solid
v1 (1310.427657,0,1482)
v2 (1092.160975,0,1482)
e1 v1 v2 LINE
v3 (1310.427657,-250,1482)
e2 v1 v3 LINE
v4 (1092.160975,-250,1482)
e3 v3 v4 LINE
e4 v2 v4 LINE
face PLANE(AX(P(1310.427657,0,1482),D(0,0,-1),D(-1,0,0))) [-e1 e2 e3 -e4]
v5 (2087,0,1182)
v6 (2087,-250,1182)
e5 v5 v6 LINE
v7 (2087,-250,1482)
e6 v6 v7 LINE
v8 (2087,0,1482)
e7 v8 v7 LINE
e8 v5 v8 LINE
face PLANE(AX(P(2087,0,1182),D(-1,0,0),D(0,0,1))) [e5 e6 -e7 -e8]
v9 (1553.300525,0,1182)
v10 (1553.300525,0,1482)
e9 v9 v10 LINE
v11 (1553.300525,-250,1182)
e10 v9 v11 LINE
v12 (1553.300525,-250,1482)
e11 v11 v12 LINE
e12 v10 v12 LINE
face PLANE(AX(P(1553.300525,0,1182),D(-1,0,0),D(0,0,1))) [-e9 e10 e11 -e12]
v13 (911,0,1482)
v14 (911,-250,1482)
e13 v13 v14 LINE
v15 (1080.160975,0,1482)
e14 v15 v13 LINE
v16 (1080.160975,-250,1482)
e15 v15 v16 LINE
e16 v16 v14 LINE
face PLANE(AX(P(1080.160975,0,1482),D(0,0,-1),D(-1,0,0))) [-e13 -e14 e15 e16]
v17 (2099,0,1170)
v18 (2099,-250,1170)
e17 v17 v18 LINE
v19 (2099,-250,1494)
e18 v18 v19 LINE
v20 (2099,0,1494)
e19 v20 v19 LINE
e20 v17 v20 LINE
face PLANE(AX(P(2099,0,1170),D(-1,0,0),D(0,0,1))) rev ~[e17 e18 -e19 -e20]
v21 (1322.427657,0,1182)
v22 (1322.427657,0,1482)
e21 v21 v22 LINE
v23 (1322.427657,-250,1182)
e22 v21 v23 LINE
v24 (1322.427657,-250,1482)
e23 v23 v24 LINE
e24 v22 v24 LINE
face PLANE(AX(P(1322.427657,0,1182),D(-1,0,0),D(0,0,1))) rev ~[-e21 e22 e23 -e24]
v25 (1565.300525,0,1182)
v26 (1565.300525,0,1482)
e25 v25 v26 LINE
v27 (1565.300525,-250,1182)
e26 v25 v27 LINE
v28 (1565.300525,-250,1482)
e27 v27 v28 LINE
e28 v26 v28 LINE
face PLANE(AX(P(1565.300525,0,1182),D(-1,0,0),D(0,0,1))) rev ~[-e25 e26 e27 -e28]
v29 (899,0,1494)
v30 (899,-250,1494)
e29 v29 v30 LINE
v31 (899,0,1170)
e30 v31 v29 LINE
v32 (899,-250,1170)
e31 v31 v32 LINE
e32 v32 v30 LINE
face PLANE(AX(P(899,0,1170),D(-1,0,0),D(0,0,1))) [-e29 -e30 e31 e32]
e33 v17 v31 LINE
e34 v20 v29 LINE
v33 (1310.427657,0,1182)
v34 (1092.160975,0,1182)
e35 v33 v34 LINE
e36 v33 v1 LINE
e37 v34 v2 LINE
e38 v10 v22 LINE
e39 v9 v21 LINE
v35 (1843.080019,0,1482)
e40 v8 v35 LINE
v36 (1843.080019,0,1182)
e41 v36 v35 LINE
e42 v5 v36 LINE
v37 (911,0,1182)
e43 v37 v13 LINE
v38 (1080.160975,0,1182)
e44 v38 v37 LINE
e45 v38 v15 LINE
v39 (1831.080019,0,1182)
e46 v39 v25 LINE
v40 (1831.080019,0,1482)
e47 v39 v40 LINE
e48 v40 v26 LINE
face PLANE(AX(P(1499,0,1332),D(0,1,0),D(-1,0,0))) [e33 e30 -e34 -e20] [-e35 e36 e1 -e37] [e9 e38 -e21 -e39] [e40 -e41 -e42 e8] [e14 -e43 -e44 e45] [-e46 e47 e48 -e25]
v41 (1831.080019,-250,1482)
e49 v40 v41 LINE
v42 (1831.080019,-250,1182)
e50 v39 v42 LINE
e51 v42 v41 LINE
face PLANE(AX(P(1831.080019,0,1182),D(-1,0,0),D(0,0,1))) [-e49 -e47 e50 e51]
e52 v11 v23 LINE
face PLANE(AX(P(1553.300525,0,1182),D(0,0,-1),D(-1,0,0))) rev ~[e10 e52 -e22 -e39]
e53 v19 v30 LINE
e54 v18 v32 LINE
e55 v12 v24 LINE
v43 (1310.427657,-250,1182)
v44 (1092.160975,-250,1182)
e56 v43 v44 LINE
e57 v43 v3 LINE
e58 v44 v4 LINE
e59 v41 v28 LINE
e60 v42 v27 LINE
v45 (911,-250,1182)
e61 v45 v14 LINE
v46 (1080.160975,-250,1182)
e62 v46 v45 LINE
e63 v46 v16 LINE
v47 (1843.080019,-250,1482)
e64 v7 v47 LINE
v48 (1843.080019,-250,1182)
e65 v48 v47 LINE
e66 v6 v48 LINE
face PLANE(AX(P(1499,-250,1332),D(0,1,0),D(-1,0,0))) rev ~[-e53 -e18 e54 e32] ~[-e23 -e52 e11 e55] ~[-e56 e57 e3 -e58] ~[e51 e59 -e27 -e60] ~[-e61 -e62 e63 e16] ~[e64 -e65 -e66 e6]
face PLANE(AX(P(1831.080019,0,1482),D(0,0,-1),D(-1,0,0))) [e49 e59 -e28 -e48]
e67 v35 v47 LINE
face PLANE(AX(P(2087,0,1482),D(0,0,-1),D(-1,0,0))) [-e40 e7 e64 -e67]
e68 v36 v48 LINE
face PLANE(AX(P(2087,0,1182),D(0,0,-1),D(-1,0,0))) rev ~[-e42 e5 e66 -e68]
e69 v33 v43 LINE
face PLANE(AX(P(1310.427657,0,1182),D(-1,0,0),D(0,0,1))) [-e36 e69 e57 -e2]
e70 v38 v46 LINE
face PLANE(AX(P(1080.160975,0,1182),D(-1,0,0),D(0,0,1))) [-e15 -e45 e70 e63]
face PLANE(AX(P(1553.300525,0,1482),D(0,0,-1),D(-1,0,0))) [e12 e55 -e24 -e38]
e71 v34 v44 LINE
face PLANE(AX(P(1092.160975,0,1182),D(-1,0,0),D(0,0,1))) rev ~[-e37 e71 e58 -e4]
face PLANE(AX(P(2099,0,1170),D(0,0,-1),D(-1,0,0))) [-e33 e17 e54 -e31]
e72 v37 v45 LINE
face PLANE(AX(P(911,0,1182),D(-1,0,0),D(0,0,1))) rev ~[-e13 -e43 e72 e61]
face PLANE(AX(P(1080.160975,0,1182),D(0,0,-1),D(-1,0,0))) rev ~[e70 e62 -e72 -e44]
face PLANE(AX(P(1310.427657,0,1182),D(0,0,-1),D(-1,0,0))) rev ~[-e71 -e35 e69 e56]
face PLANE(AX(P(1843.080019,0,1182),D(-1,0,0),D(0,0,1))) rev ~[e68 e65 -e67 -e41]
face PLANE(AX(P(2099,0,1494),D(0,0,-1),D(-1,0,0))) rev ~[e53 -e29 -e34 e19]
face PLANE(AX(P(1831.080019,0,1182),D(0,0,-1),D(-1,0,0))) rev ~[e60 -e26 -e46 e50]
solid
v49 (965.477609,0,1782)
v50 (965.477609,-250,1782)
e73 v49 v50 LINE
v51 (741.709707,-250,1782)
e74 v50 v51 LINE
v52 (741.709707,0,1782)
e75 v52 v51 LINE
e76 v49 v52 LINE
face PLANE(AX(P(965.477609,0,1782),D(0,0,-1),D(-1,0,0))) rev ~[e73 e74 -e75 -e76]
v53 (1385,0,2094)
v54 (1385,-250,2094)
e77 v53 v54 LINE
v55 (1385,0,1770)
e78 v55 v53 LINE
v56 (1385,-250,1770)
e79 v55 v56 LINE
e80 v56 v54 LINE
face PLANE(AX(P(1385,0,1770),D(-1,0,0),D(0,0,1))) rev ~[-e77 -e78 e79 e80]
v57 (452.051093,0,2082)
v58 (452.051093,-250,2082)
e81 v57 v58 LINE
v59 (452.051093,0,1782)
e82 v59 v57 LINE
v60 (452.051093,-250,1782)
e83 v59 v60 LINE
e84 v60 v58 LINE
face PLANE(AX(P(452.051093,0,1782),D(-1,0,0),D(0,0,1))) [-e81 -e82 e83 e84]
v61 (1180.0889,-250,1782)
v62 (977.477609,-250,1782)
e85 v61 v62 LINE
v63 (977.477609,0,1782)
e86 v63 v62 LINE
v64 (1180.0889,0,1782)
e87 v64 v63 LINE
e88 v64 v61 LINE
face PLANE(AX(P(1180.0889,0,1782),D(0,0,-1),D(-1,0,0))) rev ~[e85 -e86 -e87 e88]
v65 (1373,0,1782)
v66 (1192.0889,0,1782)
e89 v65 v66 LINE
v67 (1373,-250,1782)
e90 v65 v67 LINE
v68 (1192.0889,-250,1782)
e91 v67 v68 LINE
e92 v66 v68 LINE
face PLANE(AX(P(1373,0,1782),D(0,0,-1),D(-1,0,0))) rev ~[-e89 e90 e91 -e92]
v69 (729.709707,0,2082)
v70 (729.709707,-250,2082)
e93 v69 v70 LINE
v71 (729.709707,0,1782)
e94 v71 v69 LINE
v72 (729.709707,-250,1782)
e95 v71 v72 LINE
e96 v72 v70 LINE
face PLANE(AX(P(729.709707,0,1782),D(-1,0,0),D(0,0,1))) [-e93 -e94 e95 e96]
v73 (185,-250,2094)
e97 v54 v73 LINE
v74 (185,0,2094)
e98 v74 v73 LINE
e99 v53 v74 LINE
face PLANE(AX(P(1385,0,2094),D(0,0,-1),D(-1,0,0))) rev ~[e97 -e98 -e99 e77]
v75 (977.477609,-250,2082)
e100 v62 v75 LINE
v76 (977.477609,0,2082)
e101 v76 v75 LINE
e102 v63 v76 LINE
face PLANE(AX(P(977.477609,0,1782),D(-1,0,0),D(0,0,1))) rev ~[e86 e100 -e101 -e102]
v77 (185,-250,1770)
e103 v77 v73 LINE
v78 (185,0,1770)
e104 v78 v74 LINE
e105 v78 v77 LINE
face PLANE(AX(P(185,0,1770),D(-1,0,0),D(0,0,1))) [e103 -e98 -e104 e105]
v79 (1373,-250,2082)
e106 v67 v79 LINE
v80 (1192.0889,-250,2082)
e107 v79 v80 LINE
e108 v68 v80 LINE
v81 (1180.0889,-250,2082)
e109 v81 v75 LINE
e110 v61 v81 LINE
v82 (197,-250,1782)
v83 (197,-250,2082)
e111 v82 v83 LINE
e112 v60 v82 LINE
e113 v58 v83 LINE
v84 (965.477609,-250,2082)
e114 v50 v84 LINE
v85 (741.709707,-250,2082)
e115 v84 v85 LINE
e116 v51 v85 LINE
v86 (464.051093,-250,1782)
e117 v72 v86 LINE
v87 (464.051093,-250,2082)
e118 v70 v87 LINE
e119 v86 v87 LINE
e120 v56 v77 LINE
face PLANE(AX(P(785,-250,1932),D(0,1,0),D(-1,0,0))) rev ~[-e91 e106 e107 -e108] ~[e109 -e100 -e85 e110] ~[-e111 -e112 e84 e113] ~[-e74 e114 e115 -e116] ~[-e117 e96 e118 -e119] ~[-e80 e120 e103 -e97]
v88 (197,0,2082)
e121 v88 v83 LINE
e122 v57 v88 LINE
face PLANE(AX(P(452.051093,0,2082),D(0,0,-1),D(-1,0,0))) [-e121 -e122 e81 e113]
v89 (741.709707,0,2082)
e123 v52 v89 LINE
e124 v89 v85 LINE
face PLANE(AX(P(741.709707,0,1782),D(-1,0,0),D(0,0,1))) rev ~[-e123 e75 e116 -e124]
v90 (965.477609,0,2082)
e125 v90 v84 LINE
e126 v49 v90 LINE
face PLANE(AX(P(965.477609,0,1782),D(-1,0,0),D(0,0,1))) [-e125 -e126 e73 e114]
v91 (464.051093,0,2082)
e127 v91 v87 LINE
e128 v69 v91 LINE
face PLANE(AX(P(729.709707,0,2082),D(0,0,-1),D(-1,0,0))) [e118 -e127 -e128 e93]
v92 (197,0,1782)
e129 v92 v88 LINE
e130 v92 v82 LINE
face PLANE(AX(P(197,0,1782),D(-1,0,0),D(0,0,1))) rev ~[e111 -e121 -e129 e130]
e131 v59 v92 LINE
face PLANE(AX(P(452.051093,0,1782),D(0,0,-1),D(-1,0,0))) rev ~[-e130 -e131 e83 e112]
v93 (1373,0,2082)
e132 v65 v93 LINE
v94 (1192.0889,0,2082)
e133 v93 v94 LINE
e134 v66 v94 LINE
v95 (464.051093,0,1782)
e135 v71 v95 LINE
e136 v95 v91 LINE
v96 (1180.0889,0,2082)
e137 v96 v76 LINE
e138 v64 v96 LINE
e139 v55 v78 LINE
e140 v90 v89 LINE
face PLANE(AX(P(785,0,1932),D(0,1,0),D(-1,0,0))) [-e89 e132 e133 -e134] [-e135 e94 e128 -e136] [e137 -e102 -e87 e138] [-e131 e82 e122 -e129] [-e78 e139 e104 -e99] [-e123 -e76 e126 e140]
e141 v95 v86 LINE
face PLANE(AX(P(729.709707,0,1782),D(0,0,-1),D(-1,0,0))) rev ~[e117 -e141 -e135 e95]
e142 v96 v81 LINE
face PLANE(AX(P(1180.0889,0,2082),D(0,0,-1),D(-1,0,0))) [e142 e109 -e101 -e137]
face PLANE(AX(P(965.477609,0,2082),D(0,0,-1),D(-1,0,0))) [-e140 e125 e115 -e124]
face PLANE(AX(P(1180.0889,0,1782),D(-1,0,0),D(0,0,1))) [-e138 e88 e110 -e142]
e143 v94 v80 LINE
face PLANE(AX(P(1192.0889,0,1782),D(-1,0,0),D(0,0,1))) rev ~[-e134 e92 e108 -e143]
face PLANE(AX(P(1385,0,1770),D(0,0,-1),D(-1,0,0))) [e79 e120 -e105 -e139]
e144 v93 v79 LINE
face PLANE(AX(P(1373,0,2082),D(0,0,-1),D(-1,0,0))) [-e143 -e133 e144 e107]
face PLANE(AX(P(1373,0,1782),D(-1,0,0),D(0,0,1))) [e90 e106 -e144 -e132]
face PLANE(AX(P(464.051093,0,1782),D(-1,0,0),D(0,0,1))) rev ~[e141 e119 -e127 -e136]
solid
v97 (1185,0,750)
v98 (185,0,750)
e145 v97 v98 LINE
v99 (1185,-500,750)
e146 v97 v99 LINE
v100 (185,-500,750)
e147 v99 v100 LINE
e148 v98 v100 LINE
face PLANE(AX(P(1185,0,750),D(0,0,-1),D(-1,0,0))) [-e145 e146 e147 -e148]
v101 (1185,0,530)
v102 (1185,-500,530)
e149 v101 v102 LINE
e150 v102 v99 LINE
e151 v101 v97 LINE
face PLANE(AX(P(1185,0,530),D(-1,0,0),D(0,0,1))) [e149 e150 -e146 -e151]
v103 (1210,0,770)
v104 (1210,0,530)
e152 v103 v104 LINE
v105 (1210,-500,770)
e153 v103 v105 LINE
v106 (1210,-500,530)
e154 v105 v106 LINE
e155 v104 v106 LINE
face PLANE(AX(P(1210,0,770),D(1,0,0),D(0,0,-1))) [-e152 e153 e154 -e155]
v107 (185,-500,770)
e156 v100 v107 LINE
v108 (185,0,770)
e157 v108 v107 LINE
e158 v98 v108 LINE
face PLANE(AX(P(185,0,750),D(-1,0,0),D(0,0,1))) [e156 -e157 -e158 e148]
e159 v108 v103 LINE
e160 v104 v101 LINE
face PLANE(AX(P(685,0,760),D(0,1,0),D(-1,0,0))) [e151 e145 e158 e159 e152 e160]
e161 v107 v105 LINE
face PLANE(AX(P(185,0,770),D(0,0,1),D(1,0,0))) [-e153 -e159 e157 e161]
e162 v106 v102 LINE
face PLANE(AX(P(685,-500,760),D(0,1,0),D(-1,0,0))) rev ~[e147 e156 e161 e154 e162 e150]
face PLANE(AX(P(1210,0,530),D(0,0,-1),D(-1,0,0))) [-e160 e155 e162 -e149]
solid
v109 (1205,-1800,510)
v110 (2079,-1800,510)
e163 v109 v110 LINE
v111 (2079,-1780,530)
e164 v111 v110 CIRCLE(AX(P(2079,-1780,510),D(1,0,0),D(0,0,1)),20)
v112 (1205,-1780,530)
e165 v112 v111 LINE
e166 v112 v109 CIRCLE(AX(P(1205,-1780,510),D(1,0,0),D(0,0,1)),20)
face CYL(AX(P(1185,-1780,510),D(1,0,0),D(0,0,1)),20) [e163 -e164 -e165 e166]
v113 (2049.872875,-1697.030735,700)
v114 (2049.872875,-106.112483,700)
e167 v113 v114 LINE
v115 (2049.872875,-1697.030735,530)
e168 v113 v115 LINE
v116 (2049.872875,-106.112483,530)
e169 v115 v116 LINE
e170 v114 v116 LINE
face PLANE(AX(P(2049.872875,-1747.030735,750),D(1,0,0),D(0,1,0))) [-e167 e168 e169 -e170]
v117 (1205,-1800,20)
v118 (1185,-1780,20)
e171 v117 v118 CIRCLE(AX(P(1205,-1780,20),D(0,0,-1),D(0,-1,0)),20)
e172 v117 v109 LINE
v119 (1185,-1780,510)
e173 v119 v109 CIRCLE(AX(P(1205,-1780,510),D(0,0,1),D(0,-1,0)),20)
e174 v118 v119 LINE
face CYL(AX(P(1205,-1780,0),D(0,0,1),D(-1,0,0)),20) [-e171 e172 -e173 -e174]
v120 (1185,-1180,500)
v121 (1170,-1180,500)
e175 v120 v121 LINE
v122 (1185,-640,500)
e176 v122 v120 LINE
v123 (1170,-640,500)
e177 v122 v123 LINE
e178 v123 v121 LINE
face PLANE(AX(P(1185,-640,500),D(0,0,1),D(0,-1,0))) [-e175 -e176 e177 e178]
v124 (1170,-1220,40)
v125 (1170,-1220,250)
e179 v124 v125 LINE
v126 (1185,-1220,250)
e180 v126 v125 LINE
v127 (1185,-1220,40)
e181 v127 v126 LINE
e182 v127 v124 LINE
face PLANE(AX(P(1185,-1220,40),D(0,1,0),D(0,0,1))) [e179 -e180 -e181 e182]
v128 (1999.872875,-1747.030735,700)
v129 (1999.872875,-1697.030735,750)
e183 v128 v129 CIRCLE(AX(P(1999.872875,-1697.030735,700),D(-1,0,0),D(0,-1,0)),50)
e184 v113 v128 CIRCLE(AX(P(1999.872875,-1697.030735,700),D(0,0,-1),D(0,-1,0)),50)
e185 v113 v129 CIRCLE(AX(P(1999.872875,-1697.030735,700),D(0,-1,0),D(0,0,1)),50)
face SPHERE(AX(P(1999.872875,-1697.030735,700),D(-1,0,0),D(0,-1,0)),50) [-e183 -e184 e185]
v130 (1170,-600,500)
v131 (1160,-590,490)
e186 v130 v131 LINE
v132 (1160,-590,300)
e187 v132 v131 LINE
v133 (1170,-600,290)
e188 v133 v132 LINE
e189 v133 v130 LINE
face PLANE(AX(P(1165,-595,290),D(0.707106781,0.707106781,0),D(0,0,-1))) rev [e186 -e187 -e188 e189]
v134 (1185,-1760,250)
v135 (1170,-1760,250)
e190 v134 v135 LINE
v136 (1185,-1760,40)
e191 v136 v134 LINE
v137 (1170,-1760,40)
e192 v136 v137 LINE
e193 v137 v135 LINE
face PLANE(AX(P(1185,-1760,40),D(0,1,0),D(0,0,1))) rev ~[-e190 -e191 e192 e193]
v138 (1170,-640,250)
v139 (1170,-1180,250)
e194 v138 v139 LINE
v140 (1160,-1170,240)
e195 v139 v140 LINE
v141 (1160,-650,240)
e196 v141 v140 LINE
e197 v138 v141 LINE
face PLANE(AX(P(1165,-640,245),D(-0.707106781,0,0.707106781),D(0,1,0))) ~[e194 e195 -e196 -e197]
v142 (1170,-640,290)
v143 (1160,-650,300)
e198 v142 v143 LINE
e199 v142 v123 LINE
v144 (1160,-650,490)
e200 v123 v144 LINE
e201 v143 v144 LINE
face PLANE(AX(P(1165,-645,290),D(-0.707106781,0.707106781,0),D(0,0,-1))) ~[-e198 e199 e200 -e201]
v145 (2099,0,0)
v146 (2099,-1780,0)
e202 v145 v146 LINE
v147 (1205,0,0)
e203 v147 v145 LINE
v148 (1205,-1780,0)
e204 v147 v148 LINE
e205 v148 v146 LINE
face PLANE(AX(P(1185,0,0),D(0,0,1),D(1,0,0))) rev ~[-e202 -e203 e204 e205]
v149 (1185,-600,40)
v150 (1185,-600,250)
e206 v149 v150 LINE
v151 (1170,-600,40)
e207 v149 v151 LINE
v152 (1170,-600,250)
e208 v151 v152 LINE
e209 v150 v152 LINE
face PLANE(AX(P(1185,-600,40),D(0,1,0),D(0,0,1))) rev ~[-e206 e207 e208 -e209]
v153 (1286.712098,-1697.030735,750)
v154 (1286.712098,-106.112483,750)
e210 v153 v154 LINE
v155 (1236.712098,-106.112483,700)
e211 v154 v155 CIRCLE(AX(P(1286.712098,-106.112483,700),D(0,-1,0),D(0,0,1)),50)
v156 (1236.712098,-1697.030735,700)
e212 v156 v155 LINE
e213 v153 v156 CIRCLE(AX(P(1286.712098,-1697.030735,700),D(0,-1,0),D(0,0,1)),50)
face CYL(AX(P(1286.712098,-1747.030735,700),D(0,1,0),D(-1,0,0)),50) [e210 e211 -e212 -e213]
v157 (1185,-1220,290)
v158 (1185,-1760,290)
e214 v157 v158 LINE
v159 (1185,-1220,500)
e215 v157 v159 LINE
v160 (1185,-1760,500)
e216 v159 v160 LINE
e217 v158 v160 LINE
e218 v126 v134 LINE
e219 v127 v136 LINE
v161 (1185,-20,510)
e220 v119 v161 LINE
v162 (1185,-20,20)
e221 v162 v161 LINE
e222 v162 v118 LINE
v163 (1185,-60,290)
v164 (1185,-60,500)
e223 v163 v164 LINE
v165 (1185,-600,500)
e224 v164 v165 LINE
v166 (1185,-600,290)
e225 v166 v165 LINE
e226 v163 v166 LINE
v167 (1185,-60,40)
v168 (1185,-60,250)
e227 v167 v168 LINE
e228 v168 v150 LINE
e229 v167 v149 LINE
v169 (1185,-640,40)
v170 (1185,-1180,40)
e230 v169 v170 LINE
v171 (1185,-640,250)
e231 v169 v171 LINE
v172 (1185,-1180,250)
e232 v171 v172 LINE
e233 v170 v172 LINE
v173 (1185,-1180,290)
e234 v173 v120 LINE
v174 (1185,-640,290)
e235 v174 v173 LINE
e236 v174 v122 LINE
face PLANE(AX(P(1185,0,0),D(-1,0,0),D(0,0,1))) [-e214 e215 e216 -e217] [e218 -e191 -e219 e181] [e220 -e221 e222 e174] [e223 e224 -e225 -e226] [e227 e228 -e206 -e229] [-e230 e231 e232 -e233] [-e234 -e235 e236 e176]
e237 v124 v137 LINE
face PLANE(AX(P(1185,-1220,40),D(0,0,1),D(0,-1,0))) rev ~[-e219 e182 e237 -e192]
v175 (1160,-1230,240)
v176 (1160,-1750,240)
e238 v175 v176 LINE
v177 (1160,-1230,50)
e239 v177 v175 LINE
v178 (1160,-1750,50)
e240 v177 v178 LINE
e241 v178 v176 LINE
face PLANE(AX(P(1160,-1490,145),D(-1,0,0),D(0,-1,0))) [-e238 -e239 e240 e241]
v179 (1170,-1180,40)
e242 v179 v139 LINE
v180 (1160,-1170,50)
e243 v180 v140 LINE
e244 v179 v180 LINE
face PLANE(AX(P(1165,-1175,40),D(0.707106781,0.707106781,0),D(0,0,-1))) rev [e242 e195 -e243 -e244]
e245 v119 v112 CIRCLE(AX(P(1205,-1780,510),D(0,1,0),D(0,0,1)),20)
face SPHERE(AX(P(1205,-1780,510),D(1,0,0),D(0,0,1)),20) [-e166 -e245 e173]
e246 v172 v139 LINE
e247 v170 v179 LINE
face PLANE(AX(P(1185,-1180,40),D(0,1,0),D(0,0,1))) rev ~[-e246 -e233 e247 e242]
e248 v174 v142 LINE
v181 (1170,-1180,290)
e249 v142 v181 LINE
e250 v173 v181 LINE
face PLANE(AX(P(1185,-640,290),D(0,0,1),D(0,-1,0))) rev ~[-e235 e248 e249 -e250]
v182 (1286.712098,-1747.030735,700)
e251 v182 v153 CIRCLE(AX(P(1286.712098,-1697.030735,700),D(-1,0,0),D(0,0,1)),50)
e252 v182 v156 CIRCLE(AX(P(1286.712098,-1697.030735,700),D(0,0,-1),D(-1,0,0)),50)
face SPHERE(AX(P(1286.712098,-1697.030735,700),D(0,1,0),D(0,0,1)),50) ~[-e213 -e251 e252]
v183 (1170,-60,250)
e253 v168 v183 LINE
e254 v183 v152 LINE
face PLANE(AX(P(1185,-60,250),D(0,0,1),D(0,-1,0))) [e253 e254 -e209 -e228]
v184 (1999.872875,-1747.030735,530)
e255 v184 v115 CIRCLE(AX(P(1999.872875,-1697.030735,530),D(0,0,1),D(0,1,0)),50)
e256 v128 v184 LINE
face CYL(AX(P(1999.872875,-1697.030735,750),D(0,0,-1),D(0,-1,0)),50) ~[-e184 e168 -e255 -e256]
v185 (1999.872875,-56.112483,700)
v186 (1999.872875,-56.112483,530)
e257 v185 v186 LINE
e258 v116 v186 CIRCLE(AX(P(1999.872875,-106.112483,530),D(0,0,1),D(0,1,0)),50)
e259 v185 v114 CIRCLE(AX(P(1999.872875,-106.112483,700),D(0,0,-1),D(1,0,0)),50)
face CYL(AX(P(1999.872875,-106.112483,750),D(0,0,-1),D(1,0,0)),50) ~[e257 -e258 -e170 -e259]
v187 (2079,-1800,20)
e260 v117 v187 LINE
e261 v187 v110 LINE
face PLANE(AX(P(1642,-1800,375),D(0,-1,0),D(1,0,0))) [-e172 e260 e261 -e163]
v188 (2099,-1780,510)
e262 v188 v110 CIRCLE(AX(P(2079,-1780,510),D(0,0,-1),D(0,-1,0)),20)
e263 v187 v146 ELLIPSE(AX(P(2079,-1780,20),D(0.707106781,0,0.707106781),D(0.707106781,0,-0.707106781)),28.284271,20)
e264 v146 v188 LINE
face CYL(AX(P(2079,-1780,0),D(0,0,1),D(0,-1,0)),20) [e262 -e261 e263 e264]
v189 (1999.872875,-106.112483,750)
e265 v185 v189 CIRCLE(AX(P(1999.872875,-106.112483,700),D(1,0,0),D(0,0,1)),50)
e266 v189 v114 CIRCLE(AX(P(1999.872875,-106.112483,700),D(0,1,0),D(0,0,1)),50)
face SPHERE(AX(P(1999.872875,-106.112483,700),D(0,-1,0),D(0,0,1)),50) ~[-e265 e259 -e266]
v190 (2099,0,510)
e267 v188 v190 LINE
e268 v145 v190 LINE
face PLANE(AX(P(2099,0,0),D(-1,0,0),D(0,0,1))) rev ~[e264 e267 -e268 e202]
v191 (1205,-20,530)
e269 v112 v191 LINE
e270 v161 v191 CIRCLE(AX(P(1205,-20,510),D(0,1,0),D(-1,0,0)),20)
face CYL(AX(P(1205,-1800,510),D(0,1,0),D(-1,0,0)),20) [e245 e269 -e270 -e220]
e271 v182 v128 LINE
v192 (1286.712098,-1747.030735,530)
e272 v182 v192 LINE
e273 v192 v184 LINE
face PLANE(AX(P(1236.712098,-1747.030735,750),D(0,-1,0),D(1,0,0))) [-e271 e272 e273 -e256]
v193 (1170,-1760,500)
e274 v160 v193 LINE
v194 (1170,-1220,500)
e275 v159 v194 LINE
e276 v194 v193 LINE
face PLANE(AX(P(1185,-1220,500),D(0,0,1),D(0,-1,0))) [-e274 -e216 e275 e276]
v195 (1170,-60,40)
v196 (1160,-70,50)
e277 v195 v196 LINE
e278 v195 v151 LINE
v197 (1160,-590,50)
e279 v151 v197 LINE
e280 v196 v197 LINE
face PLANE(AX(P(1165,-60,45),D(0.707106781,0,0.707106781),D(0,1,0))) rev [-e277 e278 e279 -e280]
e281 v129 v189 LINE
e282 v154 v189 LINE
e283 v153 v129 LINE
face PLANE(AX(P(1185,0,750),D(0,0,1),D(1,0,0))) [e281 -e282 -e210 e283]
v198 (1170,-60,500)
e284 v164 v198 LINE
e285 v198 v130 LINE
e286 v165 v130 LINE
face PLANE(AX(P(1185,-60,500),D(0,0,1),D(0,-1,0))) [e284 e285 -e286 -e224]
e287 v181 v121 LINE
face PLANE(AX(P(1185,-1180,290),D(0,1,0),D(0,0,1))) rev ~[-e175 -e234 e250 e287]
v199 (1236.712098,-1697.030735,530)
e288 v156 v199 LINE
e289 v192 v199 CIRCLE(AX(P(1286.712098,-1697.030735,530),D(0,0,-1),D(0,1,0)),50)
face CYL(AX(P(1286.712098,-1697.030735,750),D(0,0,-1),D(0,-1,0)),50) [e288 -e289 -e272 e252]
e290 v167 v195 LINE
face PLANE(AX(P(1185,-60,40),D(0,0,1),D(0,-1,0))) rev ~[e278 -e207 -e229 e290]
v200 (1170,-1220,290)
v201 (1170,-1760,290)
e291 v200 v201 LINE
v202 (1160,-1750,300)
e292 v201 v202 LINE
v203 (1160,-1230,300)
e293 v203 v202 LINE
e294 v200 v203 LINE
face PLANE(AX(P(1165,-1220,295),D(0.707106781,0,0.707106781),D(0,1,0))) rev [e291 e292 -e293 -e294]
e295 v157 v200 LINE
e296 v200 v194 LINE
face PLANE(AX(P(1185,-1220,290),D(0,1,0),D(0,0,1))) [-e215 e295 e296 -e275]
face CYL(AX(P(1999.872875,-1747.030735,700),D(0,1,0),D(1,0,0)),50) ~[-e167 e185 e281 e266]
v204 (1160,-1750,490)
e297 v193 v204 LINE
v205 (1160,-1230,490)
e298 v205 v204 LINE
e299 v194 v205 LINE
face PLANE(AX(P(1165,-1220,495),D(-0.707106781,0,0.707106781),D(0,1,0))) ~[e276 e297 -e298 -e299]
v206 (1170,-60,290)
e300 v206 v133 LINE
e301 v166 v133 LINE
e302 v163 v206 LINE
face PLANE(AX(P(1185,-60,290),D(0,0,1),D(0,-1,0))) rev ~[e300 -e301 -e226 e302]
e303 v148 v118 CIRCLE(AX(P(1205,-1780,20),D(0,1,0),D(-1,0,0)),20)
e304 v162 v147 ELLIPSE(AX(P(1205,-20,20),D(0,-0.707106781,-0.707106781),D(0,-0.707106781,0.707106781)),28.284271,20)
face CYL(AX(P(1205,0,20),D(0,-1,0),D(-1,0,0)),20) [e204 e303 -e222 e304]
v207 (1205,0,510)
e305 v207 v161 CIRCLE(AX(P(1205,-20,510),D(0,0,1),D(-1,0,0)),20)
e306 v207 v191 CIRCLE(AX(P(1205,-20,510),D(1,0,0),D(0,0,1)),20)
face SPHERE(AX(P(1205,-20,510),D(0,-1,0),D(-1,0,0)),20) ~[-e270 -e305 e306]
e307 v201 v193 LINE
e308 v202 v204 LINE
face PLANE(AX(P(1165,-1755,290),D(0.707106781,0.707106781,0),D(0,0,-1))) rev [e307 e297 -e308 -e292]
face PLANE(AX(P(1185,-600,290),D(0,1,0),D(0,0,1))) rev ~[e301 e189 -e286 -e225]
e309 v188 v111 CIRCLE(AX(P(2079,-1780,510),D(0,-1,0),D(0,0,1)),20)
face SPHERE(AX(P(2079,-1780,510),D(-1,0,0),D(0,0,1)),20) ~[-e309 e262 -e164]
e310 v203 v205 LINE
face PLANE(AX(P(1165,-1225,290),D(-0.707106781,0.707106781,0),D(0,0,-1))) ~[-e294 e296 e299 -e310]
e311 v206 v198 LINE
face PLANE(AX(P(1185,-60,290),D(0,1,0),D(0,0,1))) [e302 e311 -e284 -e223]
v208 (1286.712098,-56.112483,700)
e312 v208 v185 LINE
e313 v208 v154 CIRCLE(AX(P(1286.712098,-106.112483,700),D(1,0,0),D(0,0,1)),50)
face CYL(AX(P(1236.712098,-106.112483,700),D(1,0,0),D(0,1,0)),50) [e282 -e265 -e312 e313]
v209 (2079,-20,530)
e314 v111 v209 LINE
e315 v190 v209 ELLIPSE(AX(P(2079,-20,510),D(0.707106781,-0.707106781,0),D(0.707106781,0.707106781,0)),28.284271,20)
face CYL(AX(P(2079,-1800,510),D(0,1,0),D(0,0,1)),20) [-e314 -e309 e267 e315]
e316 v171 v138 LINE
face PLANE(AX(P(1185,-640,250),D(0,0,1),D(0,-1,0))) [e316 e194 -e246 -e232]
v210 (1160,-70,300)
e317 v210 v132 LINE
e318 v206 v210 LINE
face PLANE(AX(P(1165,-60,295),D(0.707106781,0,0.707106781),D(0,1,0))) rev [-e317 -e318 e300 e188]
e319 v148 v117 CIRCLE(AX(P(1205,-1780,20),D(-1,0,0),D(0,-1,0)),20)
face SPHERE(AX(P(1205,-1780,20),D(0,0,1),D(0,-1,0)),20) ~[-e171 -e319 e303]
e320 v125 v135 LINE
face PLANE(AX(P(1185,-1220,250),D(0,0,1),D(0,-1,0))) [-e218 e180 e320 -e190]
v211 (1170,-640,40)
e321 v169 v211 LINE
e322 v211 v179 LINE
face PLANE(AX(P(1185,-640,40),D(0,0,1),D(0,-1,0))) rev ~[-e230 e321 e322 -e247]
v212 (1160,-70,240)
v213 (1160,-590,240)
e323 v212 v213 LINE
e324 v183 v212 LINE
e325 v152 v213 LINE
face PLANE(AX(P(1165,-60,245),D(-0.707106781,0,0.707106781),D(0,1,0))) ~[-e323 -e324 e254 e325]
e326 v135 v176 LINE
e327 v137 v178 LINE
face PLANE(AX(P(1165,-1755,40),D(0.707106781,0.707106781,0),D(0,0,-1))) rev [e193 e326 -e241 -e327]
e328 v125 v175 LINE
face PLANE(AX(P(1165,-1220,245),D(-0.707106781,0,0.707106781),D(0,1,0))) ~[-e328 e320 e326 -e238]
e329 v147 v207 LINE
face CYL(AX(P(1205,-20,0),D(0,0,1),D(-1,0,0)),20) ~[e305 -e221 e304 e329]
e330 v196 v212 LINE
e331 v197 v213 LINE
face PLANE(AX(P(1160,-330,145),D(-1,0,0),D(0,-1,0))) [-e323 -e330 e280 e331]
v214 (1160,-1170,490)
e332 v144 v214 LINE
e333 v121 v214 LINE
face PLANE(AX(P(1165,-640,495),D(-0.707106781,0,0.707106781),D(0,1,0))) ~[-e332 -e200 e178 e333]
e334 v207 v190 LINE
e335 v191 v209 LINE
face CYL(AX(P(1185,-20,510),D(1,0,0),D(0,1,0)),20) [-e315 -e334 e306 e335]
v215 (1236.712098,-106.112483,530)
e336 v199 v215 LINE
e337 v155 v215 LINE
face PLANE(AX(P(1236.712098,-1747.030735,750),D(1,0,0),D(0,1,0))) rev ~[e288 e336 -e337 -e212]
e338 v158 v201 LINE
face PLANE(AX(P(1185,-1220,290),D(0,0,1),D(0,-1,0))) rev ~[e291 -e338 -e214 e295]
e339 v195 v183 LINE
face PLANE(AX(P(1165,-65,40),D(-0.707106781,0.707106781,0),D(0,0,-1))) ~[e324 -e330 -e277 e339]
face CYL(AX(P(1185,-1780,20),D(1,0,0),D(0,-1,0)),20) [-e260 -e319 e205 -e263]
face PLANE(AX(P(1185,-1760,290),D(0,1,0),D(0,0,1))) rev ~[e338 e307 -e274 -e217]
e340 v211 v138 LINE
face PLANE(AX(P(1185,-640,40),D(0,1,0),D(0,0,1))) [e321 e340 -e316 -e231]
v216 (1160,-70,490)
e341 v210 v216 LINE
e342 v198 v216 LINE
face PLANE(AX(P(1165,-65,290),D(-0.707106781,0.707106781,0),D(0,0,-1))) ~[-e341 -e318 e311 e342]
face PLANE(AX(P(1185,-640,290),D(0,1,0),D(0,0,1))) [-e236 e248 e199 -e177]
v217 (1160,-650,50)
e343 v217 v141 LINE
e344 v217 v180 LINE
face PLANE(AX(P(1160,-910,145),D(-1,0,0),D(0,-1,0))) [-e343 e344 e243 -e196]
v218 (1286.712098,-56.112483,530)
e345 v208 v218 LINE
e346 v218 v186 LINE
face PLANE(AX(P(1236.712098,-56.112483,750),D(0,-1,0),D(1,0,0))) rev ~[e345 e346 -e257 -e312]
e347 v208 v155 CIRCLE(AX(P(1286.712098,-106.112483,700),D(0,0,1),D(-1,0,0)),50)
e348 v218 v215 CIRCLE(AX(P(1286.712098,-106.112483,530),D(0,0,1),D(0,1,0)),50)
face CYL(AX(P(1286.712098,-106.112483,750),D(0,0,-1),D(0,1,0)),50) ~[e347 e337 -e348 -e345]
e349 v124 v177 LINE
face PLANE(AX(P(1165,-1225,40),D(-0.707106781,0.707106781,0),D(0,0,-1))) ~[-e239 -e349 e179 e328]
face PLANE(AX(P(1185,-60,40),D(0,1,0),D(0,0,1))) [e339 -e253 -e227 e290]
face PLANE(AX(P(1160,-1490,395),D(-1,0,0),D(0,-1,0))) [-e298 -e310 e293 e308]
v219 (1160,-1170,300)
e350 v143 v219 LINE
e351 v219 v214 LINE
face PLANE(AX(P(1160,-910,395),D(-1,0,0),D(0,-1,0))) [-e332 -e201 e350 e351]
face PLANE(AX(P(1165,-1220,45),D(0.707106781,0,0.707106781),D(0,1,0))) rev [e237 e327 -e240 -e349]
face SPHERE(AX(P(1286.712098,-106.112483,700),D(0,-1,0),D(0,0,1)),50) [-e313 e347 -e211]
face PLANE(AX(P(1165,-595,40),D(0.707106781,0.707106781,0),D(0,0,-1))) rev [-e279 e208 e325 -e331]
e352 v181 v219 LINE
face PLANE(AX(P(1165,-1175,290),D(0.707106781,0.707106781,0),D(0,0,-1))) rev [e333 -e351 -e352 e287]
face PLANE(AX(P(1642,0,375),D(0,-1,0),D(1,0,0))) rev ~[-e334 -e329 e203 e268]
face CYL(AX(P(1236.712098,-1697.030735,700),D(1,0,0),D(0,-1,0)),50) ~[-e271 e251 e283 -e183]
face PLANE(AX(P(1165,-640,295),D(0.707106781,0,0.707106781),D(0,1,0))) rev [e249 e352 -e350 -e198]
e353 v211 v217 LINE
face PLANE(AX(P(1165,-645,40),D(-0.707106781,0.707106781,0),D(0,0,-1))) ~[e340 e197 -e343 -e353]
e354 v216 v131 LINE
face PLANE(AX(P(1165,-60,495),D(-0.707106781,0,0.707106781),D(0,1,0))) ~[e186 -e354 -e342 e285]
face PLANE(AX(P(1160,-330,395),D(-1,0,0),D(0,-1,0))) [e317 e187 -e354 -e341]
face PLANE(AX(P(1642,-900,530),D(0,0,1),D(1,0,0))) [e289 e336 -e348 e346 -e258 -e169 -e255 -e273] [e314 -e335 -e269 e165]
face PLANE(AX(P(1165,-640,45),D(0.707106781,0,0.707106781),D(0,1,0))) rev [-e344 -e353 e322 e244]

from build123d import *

# Parameters (mm, degrees)
F0_W      = 914
F0_H      = 750
F1_DEPTH  = 1800
F2_W      = 1000
F2_H      = 20
F3_DEPTH  = 500
F4_W      = 540
F4_H      = 210
F5_DEPTH  = 25
F6_W      = 914
F6_H      = 1800
F6_W_2    = 813.160777092
F6_H_2    = 1690.9182518721
F7_DEPTH  = 220
F8_W      = 1200
F8_H      = 324
F8_W_2    = 243.9199807754
F8_H_2    = 300
F8_W_3    = 265.7794940654
F8_W_4    = 230.8728685812
F8_W_5    = 218.2666818699
F8_W_6    = 169.1609747081
F9_DEPTH  = 250
F8_W_7    = 180.9111001602
F8_W_8    = 202.611290684
F8_W_9    = 223.7679018775
F8_W_10   = 265.6586144133
F8_W_11   = 255.051092865
F10_DEPTH = 25
F11_R     = 20
F12_R     = 50
F13_SIZE  = 10


# Not quite as in the source:
# - a feature names something its author has since deleted; it is built from what else it names


with BuildPart() as f1:
    # F0 (on Front) → F1 (new body)
    with BuildSketch(Plane.XZ):
        with Locations((1642, 375)):
            Rectangle(F0_W, F0_H)
    extrude(amount=F1_DEPTH)

    # F4 (on face) → F5 (join)
    with BuildSketch(Plane(origin=(1185, 0, 0), x_dir=(0, -1, 0), z_dir=(-1, 0, 0))):
        with Locations((1490, 145)):
            Rectangle(F4_W, F4_H)
        with Locations((330, 145)):
            Rectangle(F4_W, F4_H)
        with Locations((910, 145)):
            Rectangle(F4_W, F4_H)
        with Locations((1490, 395)):
            Rectangle(F4_W, F4_H)
        with Locations((330, 395)):
            Rectangle(F4_W, F4_H)
        with Locations((910, 395)):
            Rectangle(F4_W, F4_H)
    extrude(amount=F5_DEPTH)

    # F6 (on face) → F7 (cut)
    with BuildSketch(Plane.XY.offset(750)):
        with Locations((1642, -900)):
            Rectangle(F6_W, F6_H)
        with Locations((1643.2924866676, -901.5716090798)):
            Rectangle(F6_W_2, F6_H_2, mode=Mode.SUBTRACT)
    extrude(amount=-F7_DEPTH, mode=Mode.SUBTRACT)

    # F4 (on face) → F10 (join)
    with BuildSketch(Plane(origin=(1185, 0, 0), x_dir=(0, -1, 0), z_dir=(-1, 0, 0))):
        with Locations((1490, 145)):
            Rectangle(F4_W, F4_H)
        with Locations((330, 145)):
            Rectangle(F4_W, F4_H)
        with Locations((910, 145)):
            Rectangle(F4_W, F4_H)
        with Locations((1490, 395)):
            Rectangle(F4_W, F4_H)
        with Locations((330, 395)):
            Rectangle(F4_W, F4_H)
        with Locations((910, 395)):
            Rectangle(F4_W, F4_H)
    extrude(amount=F10_DEPTH)

    # F11
    f11_edges = [f1.edges().sort_by_distance(p)[0] for p in [
        (1642, -1800, 530),
        (1185, -900, 530),
        (1185, -1800, 265),
        (1185, 0, 265),
        (1642, 0, 530),
        (1642, -1800, 0),
        (1185, -900, 0),
        (2099, -900, 530),
        (2099, -1800, 265),
    ]]
    fillet(f11_edges, radius=F11_R)

    # F12
    f12_edges = [f1.edges().sort_by_distance(p)[0] for p in [
        (1236.712098, -901.571609, 750),
        (1643.292487, -1747.030735, 750),
        (1236.712098, -1747.030735, 640),
        (2049.872875, -1747.030735, 640),
        (2049.872875, -901.571609, 750),
        (1643.292487, -56.112483, 750),
        (2049.872875, -56.112483, 640),
        (1236.712098, -56.112483, 640),
    ]]
    fillet(f12_edges, radius=F12_R)

    # F13
    f13_edges = [f1.edges().sort_by_distance(p)[0] for p in [
        (1160, -330, 290),
        (1160, -600, 395),
        (1160, -330, 500),
        (1160, -60, 395),
        (1160, -910, 290),
        (1160, -1180, 395),
        (1160, -910, 500),
        (1160, -640, 395),
        (1160, -1490, 290),
        (1160, -1760, 395),
        (1160, -1490, 500),
        (1160, -1220, 395),
        (1160, -1490, 40),
        (1160, -1760, 145),
        (1160, -1490, 250),
        (1160, -1220, 145),
        (1160, -910, 40),
        (1160, -1180, 145),
        (1160, -910, 250),
        (1160, -640, 145),
        (1160, -330, 40),
        (1160, -600, 145),
        (1160, -330, 250),
        (1160, -60, 145),
    ]]
    chamfer(f13_edges, length=F13_SIZE)


with BuildPart() as f3:
    # F2 (on face) → F3 (new body)
    with BuildSketch(Plane(origin=(0, 0, 0), x_dir=(-1, 0, 0), z_dir=(0, 1, 0))):
        with Locations((-685, 760)):
            Rectangle(F2_W, F2_H)
        Polygon((-1185, 530), (-1185, 750), (-1185, 770), (-1210, 770), (-1210, 530), align=None)
    extrude(amount=-F3_DEPTH)


with BuildPart() as f9:
    # F8 (on face) → F9 (new body)
    with BuildSketch(Plane(origin=(0, 0, 0), x_dir=(-1, 0, 0), z_dir=(0, 1, 0))):
        with Locations((-1499, 1332)):
            Rectangle(F8_W, F8_H)
        with Locations((-1965.0400096123, 1332)):
            Rectangle(F8_W_2, F8_H_2, mode=Mode.SUBTRACT)
        with Locations((-1698.1902721919, 1332)):
            Rectangle(F8_W_3, F8_H_2, mode=Mode.SUBTRACT)
        with Locations((-1437.8640908686, 1332)):
            Rectangle(F8_W_4, F8_H_2, mode=Mode.SUBTRACT)
        with Locations((-1201.294315643, 1332)):
            Rectangle(F8_W_5, F8_H_2, mode=Mode.SUBTRACT)
        with Locations((-995.580487354, 1332)):
            Rectangle(F8_W_6, F8_H_2, mode=Mode.SUBTRACT)
    extrude(amount=-F9_DEPTH)


with BuildPart() as f9b:
    # F8 (on face) → F9, piece 2 (new body)
    with BuildSketch(Plane(origin=(0, 0, 0), x_dir=(-1, 0, 0), z_dir=(0, 1, 0))):
        with Locations((-785, 1932)):
            Rectangle(F8_W, F8_H)
        with Locations((-1282.5444499199, 1932)):
            Rectangle(F8_W_7, F8_H_2, mode=Mode.SUBTRACT)
        with Locations((-1078.7832544978, 1932)):
            Rectangle(F8_W_8, F8_H_2, mode=Mode.SUBTRACT)
        with Locations((-853.5936582171, 1932)):
            Rectangle(F8_W_9, F8_H_2, mode=Mode.SUBTRACT)
        with Locations((-596.8804000716, 1932)):
            Rectangle(F8_W_10, F8_H_2, mode=Mode.SUBTRACT)
        with Locations((-324.5255464325, 1932)):
            Rectangle(F8_W_11, F8_H_2, mode=Mode.SUBTRACT)
    extrude(amount=-F9_DEPTH)


solid = Compound([f1.part, f3.part, f9.part, f9b.part])
